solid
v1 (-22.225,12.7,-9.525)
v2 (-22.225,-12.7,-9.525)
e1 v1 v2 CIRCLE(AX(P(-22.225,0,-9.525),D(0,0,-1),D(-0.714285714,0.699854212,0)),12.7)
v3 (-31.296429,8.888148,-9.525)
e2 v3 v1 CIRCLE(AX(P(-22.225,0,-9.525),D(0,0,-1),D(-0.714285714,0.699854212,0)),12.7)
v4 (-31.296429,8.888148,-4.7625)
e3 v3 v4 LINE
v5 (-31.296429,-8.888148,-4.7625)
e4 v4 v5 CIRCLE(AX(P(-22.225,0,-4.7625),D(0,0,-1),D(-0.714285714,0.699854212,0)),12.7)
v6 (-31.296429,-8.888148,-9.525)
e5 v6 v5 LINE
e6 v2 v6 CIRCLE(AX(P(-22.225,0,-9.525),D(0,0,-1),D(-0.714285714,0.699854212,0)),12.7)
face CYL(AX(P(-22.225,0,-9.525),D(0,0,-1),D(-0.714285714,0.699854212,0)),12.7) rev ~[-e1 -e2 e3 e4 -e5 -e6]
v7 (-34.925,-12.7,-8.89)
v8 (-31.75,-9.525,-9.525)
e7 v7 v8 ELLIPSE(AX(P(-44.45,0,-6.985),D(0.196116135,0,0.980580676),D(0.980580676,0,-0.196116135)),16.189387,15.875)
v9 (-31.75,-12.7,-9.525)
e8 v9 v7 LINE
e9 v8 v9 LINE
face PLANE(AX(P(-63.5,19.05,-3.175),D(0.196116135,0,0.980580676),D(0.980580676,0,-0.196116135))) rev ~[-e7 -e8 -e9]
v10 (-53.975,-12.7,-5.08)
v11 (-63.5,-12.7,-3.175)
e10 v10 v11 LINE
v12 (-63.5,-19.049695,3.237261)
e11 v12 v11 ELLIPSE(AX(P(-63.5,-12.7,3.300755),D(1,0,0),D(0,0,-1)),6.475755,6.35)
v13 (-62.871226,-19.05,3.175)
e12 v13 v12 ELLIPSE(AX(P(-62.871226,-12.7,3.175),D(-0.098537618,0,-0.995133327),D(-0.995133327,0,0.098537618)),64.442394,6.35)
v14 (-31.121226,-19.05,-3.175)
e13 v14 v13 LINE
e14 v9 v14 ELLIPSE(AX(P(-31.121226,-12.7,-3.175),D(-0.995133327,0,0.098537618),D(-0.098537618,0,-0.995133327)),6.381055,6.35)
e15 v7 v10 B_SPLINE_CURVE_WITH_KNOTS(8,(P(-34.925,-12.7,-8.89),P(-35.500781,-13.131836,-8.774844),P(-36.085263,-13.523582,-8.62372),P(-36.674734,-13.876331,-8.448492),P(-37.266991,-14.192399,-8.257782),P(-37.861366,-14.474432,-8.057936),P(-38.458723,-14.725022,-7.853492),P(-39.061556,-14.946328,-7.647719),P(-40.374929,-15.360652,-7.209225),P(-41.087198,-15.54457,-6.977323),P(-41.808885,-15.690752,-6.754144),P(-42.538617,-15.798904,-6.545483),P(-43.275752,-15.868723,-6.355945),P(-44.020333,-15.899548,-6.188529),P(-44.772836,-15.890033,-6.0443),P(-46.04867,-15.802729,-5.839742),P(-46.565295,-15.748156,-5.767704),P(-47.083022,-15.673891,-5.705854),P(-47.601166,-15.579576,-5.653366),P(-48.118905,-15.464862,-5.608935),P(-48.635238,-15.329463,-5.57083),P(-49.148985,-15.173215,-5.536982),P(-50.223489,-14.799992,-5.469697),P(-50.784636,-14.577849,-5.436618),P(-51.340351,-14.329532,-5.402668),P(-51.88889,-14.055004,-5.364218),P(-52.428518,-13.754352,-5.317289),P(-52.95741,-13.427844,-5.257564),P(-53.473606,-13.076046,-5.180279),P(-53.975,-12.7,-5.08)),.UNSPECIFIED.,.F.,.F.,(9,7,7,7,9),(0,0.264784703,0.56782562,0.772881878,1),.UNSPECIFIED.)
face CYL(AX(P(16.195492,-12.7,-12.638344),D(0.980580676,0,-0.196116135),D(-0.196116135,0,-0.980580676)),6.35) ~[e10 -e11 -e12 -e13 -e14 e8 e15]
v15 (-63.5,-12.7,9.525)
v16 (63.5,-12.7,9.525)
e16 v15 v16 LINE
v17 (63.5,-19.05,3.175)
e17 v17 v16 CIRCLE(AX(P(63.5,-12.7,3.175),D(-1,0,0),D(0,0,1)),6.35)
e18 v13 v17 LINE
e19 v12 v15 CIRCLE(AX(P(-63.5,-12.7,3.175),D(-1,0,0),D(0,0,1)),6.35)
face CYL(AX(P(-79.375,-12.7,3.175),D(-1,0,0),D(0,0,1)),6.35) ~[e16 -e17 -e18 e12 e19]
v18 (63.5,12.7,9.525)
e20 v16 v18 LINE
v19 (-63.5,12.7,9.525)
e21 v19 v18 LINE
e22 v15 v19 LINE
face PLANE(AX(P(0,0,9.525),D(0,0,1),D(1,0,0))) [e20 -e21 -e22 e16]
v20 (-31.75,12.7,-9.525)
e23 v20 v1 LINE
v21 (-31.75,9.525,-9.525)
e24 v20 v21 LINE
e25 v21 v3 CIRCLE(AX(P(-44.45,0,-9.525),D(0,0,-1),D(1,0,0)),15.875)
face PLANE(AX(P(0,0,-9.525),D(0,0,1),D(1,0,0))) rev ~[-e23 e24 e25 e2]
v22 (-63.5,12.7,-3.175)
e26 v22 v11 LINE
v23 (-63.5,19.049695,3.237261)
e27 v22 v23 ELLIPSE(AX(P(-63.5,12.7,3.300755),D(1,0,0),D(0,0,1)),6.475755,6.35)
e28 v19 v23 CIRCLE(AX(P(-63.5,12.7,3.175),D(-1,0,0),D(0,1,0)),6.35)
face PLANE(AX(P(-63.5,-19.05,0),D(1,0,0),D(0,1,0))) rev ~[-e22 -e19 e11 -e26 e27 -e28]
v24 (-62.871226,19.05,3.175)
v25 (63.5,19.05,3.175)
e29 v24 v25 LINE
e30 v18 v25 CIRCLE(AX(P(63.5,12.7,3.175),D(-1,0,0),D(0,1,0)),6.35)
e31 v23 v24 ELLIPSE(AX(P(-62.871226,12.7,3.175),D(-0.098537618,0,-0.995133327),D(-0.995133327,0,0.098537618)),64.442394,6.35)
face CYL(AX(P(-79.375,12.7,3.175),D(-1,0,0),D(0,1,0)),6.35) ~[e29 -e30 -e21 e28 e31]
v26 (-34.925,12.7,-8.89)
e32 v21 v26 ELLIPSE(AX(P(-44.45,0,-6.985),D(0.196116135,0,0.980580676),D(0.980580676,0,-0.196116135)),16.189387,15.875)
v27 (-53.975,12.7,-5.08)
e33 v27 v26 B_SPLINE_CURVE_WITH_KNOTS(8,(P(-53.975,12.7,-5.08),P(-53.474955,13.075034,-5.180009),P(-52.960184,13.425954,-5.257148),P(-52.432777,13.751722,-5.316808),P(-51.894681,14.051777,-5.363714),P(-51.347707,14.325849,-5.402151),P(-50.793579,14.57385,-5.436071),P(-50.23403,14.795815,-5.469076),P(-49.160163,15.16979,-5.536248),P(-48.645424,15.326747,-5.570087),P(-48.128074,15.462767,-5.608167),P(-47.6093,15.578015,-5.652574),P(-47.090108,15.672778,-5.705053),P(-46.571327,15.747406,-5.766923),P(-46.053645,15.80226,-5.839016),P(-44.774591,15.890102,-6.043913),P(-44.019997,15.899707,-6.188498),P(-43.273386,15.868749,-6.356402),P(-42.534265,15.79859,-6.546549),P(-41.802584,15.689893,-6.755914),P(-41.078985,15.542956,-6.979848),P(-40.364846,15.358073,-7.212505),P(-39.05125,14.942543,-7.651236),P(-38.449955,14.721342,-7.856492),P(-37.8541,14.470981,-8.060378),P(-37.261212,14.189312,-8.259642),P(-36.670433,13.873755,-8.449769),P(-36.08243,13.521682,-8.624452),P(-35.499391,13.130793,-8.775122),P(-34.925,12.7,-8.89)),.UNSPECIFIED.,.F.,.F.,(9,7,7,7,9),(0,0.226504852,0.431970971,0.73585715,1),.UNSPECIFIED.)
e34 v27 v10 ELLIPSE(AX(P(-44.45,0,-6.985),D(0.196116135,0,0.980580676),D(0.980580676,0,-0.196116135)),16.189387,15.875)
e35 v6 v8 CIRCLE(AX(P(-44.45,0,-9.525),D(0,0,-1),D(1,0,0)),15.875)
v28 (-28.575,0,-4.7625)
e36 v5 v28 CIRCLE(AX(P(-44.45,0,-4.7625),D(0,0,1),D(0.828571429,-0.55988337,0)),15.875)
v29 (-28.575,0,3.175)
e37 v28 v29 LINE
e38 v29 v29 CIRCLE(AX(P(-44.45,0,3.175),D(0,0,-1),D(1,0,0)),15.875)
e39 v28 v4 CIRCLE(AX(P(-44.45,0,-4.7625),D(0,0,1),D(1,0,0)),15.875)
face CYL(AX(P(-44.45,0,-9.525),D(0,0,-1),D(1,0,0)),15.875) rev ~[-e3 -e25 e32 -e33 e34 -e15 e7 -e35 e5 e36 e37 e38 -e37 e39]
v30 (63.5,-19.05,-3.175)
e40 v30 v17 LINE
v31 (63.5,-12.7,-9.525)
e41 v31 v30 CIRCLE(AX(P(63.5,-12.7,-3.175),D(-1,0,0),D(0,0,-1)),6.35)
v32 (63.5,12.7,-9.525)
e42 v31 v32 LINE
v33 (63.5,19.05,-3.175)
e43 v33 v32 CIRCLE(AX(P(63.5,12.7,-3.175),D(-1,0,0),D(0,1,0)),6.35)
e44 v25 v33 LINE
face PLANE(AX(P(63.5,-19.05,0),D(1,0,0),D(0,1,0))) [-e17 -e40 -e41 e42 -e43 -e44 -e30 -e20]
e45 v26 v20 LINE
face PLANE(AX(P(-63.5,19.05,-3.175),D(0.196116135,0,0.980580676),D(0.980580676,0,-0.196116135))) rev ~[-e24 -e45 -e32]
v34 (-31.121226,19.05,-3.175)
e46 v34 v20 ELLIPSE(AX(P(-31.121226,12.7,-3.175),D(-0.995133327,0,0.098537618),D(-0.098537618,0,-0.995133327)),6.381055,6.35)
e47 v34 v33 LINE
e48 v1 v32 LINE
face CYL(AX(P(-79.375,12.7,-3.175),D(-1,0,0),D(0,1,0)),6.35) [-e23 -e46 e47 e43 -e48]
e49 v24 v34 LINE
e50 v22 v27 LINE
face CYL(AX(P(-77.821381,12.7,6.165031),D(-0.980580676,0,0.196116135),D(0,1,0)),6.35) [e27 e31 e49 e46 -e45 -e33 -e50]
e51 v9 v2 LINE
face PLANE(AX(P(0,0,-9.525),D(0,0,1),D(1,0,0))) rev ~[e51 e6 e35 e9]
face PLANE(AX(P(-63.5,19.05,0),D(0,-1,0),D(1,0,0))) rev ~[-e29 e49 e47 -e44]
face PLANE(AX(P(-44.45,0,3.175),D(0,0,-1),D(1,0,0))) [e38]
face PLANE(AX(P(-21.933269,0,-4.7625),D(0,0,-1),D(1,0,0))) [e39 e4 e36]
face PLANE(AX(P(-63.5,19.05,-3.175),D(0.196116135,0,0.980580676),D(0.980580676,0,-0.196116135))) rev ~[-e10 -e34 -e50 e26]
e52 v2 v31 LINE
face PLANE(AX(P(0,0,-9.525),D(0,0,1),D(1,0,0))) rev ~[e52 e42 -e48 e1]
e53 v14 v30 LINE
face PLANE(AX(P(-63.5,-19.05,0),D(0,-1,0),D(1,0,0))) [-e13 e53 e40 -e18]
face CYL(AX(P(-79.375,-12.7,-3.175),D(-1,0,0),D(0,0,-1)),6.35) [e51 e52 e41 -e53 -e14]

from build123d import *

# Parameters (mm, degrees)
F0_W        = 127
F0_H        = 38.1
F1_DEPTH    = 9.525
F2_R        = 15.875
F3_DEPTH    = 12.7
F5_DEPTH    = 4.7625
F7_DEPTH    = 38.101
F8_T1_DEPTH = 158.75
F8_T3_DEPTH = 95.8787739113
F8_T5_DEPTH = 95.8787739113


# Not quite as in the source:
# - a fillet or chamfer that OpenCascade refuses, or shapes differently, is made with other operations: its cross-section is extruded or revolved along the edge and cut away or added


with BuildPart() as f1:
    # F0 (on Top) → F1 (new body, symmetric)
    with BuildSketch(Plane.XY):
        Rectangle(F0_W, F0_H)
    extrude(amount=F1_DEPTH, both=True)

    # F2 (on face) → F3 (cut)
    with BuildSketch(Plane(origin=(0, 0, -9.525), x_dir=(1, 0, 0), z_dir=(0, 0, -1))):
        with Locations((-44.45, 0)):
            Circle(F2_R)
    extrude(amount=-F3_DEPTH, mode=Mode.SUBTRACT)

    # F4 (on face) → F5 (cut)
    with BuildSketch(Plane(origin=(0, 0, -9.525), x_dir=(1, 0, 0), z_dir=(0, 0, -1))):
        with BuildLine():
            ThreePointArc((-31.2964285714, -8.8881484952), (-17.4248511928, -11.7579152671), (-9.525, 0))
            ThreePointArc((-9.525, 0), (-17.4248511928, 11.7579152671), (-31.2964285714, 8.8881484952))
            ThreePointArc((-31.2964285714, 8.8881484952), (-29.2705966615, 4.6477240974), (-28.575, 0))
            ThreePointArc((-28.575, 0), (-29.2705966615, -4.6477240974), (-31.2964285714, -8.8881484952))
        make_face()
    extrude(amount=-F5_DEPTH, mode=Mode.SUBTRACT)

    # F6 (on face) → F7 (cut, through all)
    with BuildSketch(Plane(origin=(0, 19.05, 0), x_dir=(-1, 0, 0), z_dir=(0, 1, 0))):
        Polygon((31.75, -9.525), (63.5, -9.525), (63.5, -3.175), align=None)
    extrude(amount=-F7_DEPTH, mode=Mode.SUBTRACT)

    # F8: fillet of radius 6.35 on 6 edges, made by hand

    # F8_s2 → F8_t1 (cut)
    with BuildSketch(Plane.YZ.offset(-79.375)):
        with BuildLine():
            ThreePointArc((-12.7, 9.525), (-17.1901280605, 7.6651280605), (-19.05, 3.175))
            Line((-19.05, 3.175), (-19.05, 9.525))
            Line((-19.05, 9.525), (-12.7, 9.525))
        make_face()
        with BuildLine():
            ThreePointArc((19.05, 3.175), (17.1901280605, 7.6651280605), (12.7, 9.525))
            Line((12.7, 9.525), (19.05, 9.525))
            Line((19.05, 9.525), (19.05, 3.175))
        make_face()
        with BuildLine():
            ThreePointArc((-12.7, -9.525), (-17.1901280605, -7.6651280605), (-19.05, -3.175))
            Line((-19.05, -3.175), (-19.05, -9.525))
            Line((-19.05, -9.525), (-12.7, -9.525))
        make_face()
        with BuildLine():
            ThreePointArc((19.05, -3.175), (17.1901280605, -7.6651280605), (12.7, -9.525))
            Line((12.7, -9.525), (19.05, -9.525))
            Line((19.05, -9.525), (19.05, -3.175))
        make_face()
    extrude(amount=F8_T1_DEPTH, mode=Mode.SUBTRACT)

    # F8_s4 → F8_t3 (cut)
    with BuildSketch(Plane(origin=(-76.0138336112, 0, 15.2027667222), x_dir=(0, 1, 0), z_dir=(0.9805806757, 0, -0.1961161351))):
        with BuildLine():
            ThreePointArc((19.05, -9.2167182266), (17.1901280605, -13.7068462871), (12.7, -15.5667182266))
            Line((12.7, -15.5667182266), (19.05, -15.5667182266))
            Line((19.05, -15.5667182266), (19.05, -9.2167182266))
        make_face()
    extrude(amount=F8_T3_DEPTH, mode=Mode.SUBTRACT)

    # F8_s6 → F8_t5 (cut)
    with BuildSketch(Plane(origin=(18.0030392952, 0, -3.600607859), x_dir=(0, 1, 0), z_dir=(-0.9805806757, 0, 0.1961161351))):
        with BuildLine():
            ThreePointArc((-12.7, 15.5667182266), (-17.1901280605, 13.7068462871), (-19.05, 9.2167182266))
            Line((-19.05, 9.2167182266), (-19.05, 15.5667182266))
            Line((-19.05, 15.5667182266), (-12.7, 15.5667182266))
        make_face()
    extrude(amount=F8_T5_DEPTH, mode=Mode.SUBTRACT)


solid = f1.part
